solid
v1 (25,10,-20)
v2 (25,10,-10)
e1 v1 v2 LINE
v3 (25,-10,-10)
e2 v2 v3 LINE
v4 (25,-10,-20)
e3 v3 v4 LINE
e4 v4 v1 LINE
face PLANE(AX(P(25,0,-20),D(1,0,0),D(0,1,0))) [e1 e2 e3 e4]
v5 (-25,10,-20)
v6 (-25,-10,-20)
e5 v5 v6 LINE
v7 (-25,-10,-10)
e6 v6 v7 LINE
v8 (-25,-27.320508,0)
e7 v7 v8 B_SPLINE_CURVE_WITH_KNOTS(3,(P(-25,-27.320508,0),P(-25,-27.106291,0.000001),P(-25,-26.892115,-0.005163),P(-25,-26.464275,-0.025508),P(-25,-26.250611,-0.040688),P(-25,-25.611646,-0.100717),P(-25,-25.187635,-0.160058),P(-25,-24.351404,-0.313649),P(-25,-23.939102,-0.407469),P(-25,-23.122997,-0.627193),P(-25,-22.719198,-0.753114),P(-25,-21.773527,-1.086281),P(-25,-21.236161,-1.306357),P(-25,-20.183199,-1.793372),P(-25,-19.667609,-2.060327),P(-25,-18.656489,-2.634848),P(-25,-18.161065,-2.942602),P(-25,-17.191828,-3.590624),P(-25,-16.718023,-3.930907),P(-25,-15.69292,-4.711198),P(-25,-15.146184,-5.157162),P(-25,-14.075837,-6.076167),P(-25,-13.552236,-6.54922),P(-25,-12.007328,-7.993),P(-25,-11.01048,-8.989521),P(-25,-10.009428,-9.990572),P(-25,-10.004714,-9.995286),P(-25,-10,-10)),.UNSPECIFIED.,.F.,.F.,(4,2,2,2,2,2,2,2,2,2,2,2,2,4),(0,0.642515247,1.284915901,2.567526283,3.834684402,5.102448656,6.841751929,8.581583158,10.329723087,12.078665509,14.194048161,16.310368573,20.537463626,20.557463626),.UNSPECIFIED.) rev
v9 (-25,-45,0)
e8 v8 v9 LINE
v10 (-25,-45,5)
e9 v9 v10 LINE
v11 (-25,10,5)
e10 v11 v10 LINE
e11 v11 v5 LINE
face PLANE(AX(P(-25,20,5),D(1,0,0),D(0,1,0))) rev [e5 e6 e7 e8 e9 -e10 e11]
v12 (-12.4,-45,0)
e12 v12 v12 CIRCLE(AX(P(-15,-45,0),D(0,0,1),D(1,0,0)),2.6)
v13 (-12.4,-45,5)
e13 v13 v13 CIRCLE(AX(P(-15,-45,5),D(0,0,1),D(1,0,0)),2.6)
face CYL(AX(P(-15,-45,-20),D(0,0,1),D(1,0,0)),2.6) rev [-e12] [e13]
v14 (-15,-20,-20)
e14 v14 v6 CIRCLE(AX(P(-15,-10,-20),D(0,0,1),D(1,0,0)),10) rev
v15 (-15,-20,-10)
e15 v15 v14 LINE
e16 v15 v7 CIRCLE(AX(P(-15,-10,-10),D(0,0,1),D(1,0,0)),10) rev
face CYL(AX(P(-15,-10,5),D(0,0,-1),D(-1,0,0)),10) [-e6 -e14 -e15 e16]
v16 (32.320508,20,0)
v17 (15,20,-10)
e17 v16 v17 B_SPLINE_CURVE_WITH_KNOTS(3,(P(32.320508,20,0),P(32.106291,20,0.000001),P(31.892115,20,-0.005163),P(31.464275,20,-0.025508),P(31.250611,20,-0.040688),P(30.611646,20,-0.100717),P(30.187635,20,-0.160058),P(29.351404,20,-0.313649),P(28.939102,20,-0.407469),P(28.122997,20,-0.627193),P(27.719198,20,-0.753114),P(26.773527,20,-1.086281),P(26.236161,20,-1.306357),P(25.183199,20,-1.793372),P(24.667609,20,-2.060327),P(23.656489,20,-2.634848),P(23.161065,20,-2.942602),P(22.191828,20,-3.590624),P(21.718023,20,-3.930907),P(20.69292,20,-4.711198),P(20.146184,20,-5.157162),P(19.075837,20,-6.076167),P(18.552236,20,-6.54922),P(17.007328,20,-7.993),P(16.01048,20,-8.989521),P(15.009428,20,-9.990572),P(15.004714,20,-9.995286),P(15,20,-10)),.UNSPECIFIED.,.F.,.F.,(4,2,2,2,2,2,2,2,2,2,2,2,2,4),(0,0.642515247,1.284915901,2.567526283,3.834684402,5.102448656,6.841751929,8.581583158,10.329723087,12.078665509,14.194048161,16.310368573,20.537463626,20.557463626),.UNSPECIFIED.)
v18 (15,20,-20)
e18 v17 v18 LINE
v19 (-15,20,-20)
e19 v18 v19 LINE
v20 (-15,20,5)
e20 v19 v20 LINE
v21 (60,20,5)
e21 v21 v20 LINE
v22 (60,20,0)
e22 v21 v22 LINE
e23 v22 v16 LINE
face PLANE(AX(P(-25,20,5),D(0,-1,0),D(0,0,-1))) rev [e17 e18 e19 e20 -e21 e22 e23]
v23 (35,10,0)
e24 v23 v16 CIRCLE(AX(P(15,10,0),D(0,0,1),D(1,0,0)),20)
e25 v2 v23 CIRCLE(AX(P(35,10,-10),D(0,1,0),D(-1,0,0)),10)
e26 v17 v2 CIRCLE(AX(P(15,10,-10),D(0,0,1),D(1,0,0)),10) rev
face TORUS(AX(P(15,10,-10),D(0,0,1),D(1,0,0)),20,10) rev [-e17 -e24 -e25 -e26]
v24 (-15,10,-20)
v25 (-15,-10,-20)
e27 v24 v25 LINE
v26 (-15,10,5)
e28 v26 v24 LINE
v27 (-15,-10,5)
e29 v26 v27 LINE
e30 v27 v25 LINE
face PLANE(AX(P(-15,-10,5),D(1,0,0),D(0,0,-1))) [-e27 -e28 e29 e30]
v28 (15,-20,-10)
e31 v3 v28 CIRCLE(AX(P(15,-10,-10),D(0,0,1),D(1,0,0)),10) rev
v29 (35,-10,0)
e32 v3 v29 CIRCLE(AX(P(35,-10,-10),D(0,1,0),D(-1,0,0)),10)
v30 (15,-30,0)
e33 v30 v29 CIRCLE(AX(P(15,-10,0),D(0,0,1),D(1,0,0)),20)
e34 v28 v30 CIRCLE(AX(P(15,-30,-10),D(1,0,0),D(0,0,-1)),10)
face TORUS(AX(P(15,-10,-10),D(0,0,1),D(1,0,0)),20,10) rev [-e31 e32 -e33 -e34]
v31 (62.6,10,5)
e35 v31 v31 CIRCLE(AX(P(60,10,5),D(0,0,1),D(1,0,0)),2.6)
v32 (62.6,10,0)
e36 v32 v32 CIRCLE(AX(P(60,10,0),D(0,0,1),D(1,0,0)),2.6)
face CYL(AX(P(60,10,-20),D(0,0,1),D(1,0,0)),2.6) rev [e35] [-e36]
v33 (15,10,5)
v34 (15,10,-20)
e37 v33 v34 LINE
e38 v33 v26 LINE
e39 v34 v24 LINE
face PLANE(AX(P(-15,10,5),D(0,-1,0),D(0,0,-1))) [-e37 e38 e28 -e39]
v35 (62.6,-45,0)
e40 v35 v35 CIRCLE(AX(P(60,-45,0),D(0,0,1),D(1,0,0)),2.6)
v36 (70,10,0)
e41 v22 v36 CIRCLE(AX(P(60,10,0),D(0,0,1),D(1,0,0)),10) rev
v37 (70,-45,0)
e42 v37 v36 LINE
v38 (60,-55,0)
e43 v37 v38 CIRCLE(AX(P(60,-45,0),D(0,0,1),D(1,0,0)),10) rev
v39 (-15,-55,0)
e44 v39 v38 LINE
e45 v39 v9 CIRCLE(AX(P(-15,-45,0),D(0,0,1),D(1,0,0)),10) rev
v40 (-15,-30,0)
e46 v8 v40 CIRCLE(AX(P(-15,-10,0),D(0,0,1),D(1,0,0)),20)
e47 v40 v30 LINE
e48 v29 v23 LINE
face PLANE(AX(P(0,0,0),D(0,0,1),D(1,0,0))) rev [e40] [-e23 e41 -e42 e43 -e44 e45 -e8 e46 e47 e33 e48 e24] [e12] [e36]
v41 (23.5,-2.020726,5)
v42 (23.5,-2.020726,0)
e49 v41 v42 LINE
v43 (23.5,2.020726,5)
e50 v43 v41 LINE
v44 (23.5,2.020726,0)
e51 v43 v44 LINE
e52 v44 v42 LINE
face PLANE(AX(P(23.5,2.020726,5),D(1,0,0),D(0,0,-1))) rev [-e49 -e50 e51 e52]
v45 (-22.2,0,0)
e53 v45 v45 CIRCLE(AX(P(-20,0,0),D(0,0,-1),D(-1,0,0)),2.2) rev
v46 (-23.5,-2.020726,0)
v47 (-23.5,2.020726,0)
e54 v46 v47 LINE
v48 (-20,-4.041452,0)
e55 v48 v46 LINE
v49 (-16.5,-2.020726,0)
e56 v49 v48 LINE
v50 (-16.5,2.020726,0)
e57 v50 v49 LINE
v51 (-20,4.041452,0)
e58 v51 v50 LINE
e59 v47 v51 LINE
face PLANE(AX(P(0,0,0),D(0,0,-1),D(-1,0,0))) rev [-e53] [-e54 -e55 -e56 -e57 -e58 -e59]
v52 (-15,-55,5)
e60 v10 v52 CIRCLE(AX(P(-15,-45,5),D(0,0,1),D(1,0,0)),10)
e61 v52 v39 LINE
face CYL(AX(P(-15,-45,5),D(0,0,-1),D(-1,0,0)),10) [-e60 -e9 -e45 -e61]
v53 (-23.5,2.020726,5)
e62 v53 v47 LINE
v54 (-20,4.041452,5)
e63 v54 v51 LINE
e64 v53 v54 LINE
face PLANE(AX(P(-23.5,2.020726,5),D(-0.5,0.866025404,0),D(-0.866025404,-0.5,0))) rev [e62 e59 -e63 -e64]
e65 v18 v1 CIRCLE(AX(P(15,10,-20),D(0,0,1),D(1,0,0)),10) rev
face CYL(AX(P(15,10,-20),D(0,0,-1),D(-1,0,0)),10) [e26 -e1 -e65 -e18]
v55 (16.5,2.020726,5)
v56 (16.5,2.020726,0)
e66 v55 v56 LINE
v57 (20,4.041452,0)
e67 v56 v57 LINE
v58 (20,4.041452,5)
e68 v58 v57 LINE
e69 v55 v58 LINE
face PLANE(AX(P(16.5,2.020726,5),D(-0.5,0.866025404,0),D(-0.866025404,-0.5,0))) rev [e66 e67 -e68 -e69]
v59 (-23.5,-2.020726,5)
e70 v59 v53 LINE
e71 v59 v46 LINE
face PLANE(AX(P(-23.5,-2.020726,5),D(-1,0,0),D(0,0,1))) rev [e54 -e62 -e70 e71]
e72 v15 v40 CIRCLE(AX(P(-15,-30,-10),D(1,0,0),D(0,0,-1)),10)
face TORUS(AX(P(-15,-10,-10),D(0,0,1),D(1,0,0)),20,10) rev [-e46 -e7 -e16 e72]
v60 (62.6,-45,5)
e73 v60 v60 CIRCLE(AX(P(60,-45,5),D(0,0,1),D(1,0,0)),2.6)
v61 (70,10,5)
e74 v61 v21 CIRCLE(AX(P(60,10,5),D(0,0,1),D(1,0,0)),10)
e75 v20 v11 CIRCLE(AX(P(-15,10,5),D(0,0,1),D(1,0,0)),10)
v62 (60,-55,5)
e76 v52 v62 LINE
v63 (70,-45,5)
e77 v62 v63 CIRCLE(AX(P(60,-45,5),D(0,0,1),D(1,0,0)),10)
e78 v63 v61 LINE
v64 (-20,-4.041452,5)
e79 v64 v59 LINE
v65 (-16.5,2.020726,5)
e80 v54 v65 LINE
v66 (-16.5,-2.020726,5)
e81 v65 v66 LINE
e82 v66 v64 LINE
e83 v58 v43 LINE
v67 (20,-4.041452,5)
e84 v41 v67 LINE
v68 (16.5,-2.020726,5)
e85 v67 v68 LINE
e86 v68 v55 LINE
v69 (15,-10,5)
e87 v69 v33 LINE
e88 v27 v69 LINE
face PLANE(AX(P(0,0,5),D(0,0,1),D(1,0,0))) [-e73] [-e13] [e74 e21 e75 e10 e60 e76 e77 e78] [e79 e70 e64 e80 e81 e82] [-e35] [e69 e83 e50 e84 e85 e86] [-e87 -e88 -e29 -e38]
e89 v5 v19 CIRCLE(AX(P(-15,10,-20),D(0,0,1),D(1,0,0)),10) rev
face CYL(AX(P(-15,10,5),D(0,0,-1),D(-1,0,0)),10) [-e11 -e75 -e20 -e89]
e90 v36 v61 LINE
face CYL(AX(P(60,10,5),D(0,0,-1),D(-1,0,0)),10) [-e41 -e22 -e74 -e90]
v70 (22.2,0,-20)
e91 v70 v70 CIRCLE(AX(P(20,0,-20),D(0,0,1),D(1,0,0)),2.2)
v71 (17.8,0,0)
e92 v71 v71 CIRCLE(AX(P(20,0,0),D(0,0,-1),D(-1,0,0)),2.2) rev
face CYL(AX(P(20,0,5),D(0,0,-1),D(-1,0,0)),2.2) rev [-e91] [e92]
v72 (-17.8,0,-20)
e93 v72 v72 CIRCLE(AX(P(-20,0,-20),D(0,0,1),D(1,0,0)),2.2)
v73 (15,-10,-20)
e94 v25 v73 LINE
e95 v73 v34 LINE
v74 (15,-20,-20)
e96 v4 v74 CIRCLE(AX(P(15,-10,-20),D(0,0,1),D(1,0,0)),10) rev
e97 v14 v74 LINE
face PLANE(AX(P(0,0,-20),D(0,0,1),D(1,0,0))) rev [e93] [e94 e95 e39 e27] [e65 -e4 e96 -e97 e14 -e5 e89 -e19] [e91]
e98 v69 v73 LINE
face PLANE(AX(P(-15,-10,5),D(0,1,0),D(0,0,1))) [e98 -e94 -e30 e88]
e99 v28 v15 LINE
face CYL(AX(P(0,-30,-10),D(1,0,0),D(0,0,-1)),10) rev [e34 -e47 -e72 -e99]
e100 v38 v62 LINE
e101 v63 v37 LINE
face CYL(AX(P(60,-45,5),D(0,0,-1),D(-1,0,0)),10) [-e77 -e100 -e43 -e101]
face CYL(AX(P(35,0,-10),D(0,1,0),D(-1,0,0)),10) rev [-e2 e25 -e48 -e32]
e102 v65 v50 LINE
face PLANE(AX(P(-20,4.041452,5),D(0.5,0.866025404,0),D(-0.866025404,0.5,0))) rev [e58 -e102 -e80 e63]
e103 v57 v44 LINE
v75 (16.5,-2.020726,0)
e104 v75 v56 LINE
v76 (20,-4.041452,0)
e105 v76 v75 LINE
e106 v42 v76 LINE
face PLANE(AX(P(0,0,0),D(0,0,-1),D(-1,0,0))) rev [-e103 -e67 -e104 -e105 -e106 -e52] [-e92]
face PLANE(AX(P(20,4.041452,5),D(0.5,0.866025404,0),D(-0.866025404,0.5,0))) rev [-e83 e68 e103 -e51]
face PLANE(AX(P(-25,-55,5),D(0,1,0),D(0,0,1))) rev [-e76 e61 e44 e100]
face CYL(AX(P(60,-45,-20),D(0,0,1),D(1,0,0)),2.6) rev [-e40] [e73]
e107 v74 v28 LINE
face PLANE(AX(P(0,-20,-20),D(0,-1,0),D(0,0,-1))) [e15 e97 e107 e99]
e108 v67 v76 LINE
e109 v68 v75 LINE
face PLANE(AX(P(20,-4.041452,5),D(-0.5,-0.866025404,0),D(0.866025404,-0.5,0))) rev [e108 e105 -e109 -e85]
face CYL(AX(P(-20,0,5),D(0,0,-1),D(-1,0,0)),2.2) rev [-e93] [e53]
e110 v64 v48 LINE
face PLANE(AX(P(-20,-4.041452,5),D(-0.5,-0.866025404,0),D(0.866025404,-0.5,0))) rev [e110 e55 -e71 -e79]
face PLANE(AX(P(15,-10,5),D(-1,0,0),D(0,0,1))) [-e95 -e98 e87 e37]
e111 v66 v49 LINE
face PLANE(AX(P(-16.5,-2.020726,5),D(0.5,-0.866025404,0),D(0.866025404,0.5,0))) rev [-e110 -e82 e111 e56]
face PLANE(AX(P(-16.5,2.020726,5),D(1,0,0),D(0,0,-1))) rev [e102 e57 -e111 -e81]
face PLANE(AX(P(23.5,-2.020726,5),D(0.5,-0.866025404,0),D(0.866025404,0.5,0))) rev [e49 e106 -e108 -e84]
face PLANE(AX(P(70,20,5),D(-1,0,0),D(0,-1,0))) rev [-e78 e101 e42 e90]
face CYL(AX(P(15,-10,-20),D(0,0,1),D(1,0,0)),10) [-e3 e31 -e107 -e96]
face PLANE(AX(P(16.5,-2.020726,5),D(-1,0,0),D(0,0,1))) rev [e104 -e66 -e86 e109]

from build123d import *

# Parameters (mm, degrees)
SKETCH_1_W               = 95
SKETCH_1_H               = 75
SKETCH_1_W_2             = 30
SKETCH_1_H_2             = 20
EXTRUDE_1_DEPTH          = 5
EXTRUDE_START            = -5
SKETCH_2_W               = 50
SKETCH_2_H               = 40
SKETCH_2_W_2             = 30
SKETCH_2_H_2             = 20
EXTRUDE_2_DEPTH          = 20
CUT_EXTRUDE_1_DEPTH      = 93.466210045
CUT_EXTRUDE_1_DEPTH_BACK = 93.466210045
SKETCH_3_R               = 2.2
CUT_EXTRUDE_2_DEPTH      = 5
SKETCH_5_R               = 2.6
CUT_EXTRUDE_3_DEPTH      = 93.466210045
FILLET_4_R               = 10
FILLET_5_R               = 10


with BuildPart() as part:
    # 草图1 → 凸台-拉伸1 (new body)
    with BuildSketch(Plane.XY):
        with Locations((22.5, -17.5)):
            Rectangle(SKETCH_1_W, SKETCH_1_H)
        Rectangle(SKETCH_1_W_2, SKETCH_1_H_2, mode=Mode.SUBTRACT)
    extrude(amount=EXTRUDE_1_DEPTH)

    # 草图2 → 凸台-拉伸2 (add)
    with BuildSketch(Plane.XY.offset(5).offset(EXTRUDE_START)):
        Rectangle(SKETCH_2_W, SKETCH_2_H)
        Rectangle(SKETCH_2_W_2, SKETCH_2_H_2, mode=Mode.SUBTRACT)
    extrude(amount=-EXTRUDE_2_DEPTH)

    # 草图3 → 切除-拉伸1 (cut, two sides: drawn at the far end of the back side and taken through both)
    with BuildSketch(Plane(origin=(0, 0, -20), x_dir=(-1, 0, 0), z_dir=(0, 0, -1)).offset(-CUT_EXTRUDE_1_DEPTH_BACK)):
        with Locations((20, 0)):
            Circle(SKETCH_3_R)
        with Locations((-20, 0)):
            Circle(SKETCH_3_R)
    extrude(amount=CUT_EXTRUDE_1_DEPTH + CUT_EXTRUDE_1_DEPTH_BACK, mode=Mode.SUBTRACT)

    # 草图4 → 切除-拉伸2 (cut)
    with BuildSketch(Plane(origin=(0, 0, 0), x_dir=(-1, 0, 0), z_dir=(0, 0, -1))):
        Polygon((20, 4.041451884), (16.5, 2.020725942), (16.5, -2.020725942), (20, -4.041451884), (23.5, -2.020725942), (23.5, 2.020725942), align=None)
        Polygon((-20, 4.041451884), (-23.5, 2.020725942), (-23.5, -2.020725942), (-20, -4.041451884), (-16.5, -2.020725942), (-16.5, 2.020725942), align=None)
    extrude(amount=-CUT_EXTRUDE_2_DEPTH, mode=Mode.SUBTRACT)

    # 草图5 → 切除-拉伸3 (cut, through all)
    with BuildSketch(Plane.XY.offset(5)):
        with Locations((60, -45)):
            Circle(SKETCH_5_R)
        with Locations((-15, -45)):
            Circle(SKETCH_5_R)
        with Locations((60, 10)):
            Circle(SKETCH_5_R)
    extrude(amount=-CUT_EXTRUDE_3_DEPTH, mode=Mode.SUBTRACT)

    # 圆角4
    fillet_4_edges = [part.edges().sort_by_distance(p)[0] for p in [
        (25, 20, -10),
        (25, -20, -10),
        (-25, -20, -10),
        (-25, 20, -7.5),
        (70, 20, 2.5),
        (70, -55, 2.5),
        (-25, -55, 2.5),
    ]]
    fillet(fillet_4_edges, radius=FILLET_4_R)

    # 圆角5
    # the kernel refuses this fillet: 10 mm, written as the material it adds along each edge
    with BuildSketch(Plane(origin=(15, -20, 0), x_dir=(0, 0, -1), z_dir=(-1, 0, 0))) as fillet_5_piece_1:
        with BuildLine():
            CenterArc((FILLET_5_R, FILLET_5_R), FILLET_5_R, 180, 90)
            Line((0, FILLET_5_R), (0, 0))
            Line((0, 0), (FILLET_5_R, 0))
        make_face()
    extrude(amount=30)
    with BuildSketch(Plane(origin=(25, 10, 0), x_dir=(0, 0, -1), z_dir=(0, -1, 0))) as fillet_5_piece_2:
        with BuildLine():
            CenterArc((FILLET_5_R, FILLET_5_R), FILLET_5_R, 180, 90)
            Line((0, FILLET_5_R), (0, 0))
            Line((0, 0), (FILLET_5_R, 0))
        make_face()
    extrude(amount=20)
    with BuildSketch(Plane(origin=(-15, -10, 0), x_dir=(0.801744239297648, 0.5976672776328277, 0), z_dir=(0.5976672776328277, -0.801744239297648, 0))) as fillet_5_piece_3_section:
        with BuildLine():
            CenterArc((10 + FILLET_5_R, -FILLET_5_R), FILLET_5_R, 90, 90)
            Line((10 + FILLET_5_R, 0), (10, 0))
            Line((10, 0), (10, -FILLET_5_R))
        make_face()
    fillet_5_piece_3 = revolve(axis=Axis((-15, -10, 0), (0, 0, 1)), revolution_arc=233.296989237, mode=Mode.PRIVATE)
    fillet_5_piece_3 = split(fillet_5_piece_3, bisect_by=Plane(origin=(-25, -15.925458523, -2.890503096), z_dir=(1, 0, 0)), keep=Keep.TOP, mode=Mode.PRIVATE)
    fillet_5_piece_3 = split(fillet_5_piece_3, bisect_by=Plane(origin=(-18.102265681, -5.137109304, -2.890503096), z_dir=(-0.4999999999999994, -0.866025403784439, 0)), keep=Keep.TOP, mode=Mode.PRIVATE)
    add(fillet_5_piece_3)
    with BuildSketch(Plane(origin=(15, -10, 0), x_dir=(1, 0, 0), z_dir=(0, 1, 0))) as fillet_5_piece_4:
        with BuildLine():
            CenterArc((10 + FILLET_5_R, FILLET_5_R), FILLET_5_R, 180, 90)
            Line((10 + FILLET_5_R, 0), (10, 0))
            Line((10, 0), (10, FILLET_5_R))
        make_face()
    revolve(axis=Axis((15, -10, 0), (0, 0, -1)), revolution_arc=90)
    with BuildSketch(Plane(origin=(15, 10, 0), x_dir=(-0.597667277632828, -0.8017442392976479, 0), z_dir=(0.8017442392976479, -0.597667277632828, 0))) as fillet_5_piece_5_section:
        with BuildLine():
            CenterArc((10 + FILLET_5_R, FILLET_5_R), FILLET_5_R, 180, 90)
            Line((10 + FILLET_5_R, 0), (10, 0))
            Line((10, 0), (10, FILLET_5_R))
        make_face()
    fillet_5_piece_5 = revolve(axis=Axis((15, 10, 0), (0, 0, -1)), revolution_arc=233.296989237, mode=Mode.PRIVATE)
    fillet_5_piece_5 = split(fillet_5_piece_5, bisect_by=Plane(origin=(22.499389328, 20, -3.116283122), z_dir=(0, -1, 0)), keep=Keep.TOP, mode=Mode.PRIVATE)
    fillet_5_piece_5 = split(fillet_5_piece_5, bisect_by=Plane(origin=(22.499389328, 10, -3.116283122), z_dir=(0, 1, 0)), keep=Keep.TOP, mode=Mode.PRIVATE)
    add(fillet_5_piece_5)


solid = part.part
